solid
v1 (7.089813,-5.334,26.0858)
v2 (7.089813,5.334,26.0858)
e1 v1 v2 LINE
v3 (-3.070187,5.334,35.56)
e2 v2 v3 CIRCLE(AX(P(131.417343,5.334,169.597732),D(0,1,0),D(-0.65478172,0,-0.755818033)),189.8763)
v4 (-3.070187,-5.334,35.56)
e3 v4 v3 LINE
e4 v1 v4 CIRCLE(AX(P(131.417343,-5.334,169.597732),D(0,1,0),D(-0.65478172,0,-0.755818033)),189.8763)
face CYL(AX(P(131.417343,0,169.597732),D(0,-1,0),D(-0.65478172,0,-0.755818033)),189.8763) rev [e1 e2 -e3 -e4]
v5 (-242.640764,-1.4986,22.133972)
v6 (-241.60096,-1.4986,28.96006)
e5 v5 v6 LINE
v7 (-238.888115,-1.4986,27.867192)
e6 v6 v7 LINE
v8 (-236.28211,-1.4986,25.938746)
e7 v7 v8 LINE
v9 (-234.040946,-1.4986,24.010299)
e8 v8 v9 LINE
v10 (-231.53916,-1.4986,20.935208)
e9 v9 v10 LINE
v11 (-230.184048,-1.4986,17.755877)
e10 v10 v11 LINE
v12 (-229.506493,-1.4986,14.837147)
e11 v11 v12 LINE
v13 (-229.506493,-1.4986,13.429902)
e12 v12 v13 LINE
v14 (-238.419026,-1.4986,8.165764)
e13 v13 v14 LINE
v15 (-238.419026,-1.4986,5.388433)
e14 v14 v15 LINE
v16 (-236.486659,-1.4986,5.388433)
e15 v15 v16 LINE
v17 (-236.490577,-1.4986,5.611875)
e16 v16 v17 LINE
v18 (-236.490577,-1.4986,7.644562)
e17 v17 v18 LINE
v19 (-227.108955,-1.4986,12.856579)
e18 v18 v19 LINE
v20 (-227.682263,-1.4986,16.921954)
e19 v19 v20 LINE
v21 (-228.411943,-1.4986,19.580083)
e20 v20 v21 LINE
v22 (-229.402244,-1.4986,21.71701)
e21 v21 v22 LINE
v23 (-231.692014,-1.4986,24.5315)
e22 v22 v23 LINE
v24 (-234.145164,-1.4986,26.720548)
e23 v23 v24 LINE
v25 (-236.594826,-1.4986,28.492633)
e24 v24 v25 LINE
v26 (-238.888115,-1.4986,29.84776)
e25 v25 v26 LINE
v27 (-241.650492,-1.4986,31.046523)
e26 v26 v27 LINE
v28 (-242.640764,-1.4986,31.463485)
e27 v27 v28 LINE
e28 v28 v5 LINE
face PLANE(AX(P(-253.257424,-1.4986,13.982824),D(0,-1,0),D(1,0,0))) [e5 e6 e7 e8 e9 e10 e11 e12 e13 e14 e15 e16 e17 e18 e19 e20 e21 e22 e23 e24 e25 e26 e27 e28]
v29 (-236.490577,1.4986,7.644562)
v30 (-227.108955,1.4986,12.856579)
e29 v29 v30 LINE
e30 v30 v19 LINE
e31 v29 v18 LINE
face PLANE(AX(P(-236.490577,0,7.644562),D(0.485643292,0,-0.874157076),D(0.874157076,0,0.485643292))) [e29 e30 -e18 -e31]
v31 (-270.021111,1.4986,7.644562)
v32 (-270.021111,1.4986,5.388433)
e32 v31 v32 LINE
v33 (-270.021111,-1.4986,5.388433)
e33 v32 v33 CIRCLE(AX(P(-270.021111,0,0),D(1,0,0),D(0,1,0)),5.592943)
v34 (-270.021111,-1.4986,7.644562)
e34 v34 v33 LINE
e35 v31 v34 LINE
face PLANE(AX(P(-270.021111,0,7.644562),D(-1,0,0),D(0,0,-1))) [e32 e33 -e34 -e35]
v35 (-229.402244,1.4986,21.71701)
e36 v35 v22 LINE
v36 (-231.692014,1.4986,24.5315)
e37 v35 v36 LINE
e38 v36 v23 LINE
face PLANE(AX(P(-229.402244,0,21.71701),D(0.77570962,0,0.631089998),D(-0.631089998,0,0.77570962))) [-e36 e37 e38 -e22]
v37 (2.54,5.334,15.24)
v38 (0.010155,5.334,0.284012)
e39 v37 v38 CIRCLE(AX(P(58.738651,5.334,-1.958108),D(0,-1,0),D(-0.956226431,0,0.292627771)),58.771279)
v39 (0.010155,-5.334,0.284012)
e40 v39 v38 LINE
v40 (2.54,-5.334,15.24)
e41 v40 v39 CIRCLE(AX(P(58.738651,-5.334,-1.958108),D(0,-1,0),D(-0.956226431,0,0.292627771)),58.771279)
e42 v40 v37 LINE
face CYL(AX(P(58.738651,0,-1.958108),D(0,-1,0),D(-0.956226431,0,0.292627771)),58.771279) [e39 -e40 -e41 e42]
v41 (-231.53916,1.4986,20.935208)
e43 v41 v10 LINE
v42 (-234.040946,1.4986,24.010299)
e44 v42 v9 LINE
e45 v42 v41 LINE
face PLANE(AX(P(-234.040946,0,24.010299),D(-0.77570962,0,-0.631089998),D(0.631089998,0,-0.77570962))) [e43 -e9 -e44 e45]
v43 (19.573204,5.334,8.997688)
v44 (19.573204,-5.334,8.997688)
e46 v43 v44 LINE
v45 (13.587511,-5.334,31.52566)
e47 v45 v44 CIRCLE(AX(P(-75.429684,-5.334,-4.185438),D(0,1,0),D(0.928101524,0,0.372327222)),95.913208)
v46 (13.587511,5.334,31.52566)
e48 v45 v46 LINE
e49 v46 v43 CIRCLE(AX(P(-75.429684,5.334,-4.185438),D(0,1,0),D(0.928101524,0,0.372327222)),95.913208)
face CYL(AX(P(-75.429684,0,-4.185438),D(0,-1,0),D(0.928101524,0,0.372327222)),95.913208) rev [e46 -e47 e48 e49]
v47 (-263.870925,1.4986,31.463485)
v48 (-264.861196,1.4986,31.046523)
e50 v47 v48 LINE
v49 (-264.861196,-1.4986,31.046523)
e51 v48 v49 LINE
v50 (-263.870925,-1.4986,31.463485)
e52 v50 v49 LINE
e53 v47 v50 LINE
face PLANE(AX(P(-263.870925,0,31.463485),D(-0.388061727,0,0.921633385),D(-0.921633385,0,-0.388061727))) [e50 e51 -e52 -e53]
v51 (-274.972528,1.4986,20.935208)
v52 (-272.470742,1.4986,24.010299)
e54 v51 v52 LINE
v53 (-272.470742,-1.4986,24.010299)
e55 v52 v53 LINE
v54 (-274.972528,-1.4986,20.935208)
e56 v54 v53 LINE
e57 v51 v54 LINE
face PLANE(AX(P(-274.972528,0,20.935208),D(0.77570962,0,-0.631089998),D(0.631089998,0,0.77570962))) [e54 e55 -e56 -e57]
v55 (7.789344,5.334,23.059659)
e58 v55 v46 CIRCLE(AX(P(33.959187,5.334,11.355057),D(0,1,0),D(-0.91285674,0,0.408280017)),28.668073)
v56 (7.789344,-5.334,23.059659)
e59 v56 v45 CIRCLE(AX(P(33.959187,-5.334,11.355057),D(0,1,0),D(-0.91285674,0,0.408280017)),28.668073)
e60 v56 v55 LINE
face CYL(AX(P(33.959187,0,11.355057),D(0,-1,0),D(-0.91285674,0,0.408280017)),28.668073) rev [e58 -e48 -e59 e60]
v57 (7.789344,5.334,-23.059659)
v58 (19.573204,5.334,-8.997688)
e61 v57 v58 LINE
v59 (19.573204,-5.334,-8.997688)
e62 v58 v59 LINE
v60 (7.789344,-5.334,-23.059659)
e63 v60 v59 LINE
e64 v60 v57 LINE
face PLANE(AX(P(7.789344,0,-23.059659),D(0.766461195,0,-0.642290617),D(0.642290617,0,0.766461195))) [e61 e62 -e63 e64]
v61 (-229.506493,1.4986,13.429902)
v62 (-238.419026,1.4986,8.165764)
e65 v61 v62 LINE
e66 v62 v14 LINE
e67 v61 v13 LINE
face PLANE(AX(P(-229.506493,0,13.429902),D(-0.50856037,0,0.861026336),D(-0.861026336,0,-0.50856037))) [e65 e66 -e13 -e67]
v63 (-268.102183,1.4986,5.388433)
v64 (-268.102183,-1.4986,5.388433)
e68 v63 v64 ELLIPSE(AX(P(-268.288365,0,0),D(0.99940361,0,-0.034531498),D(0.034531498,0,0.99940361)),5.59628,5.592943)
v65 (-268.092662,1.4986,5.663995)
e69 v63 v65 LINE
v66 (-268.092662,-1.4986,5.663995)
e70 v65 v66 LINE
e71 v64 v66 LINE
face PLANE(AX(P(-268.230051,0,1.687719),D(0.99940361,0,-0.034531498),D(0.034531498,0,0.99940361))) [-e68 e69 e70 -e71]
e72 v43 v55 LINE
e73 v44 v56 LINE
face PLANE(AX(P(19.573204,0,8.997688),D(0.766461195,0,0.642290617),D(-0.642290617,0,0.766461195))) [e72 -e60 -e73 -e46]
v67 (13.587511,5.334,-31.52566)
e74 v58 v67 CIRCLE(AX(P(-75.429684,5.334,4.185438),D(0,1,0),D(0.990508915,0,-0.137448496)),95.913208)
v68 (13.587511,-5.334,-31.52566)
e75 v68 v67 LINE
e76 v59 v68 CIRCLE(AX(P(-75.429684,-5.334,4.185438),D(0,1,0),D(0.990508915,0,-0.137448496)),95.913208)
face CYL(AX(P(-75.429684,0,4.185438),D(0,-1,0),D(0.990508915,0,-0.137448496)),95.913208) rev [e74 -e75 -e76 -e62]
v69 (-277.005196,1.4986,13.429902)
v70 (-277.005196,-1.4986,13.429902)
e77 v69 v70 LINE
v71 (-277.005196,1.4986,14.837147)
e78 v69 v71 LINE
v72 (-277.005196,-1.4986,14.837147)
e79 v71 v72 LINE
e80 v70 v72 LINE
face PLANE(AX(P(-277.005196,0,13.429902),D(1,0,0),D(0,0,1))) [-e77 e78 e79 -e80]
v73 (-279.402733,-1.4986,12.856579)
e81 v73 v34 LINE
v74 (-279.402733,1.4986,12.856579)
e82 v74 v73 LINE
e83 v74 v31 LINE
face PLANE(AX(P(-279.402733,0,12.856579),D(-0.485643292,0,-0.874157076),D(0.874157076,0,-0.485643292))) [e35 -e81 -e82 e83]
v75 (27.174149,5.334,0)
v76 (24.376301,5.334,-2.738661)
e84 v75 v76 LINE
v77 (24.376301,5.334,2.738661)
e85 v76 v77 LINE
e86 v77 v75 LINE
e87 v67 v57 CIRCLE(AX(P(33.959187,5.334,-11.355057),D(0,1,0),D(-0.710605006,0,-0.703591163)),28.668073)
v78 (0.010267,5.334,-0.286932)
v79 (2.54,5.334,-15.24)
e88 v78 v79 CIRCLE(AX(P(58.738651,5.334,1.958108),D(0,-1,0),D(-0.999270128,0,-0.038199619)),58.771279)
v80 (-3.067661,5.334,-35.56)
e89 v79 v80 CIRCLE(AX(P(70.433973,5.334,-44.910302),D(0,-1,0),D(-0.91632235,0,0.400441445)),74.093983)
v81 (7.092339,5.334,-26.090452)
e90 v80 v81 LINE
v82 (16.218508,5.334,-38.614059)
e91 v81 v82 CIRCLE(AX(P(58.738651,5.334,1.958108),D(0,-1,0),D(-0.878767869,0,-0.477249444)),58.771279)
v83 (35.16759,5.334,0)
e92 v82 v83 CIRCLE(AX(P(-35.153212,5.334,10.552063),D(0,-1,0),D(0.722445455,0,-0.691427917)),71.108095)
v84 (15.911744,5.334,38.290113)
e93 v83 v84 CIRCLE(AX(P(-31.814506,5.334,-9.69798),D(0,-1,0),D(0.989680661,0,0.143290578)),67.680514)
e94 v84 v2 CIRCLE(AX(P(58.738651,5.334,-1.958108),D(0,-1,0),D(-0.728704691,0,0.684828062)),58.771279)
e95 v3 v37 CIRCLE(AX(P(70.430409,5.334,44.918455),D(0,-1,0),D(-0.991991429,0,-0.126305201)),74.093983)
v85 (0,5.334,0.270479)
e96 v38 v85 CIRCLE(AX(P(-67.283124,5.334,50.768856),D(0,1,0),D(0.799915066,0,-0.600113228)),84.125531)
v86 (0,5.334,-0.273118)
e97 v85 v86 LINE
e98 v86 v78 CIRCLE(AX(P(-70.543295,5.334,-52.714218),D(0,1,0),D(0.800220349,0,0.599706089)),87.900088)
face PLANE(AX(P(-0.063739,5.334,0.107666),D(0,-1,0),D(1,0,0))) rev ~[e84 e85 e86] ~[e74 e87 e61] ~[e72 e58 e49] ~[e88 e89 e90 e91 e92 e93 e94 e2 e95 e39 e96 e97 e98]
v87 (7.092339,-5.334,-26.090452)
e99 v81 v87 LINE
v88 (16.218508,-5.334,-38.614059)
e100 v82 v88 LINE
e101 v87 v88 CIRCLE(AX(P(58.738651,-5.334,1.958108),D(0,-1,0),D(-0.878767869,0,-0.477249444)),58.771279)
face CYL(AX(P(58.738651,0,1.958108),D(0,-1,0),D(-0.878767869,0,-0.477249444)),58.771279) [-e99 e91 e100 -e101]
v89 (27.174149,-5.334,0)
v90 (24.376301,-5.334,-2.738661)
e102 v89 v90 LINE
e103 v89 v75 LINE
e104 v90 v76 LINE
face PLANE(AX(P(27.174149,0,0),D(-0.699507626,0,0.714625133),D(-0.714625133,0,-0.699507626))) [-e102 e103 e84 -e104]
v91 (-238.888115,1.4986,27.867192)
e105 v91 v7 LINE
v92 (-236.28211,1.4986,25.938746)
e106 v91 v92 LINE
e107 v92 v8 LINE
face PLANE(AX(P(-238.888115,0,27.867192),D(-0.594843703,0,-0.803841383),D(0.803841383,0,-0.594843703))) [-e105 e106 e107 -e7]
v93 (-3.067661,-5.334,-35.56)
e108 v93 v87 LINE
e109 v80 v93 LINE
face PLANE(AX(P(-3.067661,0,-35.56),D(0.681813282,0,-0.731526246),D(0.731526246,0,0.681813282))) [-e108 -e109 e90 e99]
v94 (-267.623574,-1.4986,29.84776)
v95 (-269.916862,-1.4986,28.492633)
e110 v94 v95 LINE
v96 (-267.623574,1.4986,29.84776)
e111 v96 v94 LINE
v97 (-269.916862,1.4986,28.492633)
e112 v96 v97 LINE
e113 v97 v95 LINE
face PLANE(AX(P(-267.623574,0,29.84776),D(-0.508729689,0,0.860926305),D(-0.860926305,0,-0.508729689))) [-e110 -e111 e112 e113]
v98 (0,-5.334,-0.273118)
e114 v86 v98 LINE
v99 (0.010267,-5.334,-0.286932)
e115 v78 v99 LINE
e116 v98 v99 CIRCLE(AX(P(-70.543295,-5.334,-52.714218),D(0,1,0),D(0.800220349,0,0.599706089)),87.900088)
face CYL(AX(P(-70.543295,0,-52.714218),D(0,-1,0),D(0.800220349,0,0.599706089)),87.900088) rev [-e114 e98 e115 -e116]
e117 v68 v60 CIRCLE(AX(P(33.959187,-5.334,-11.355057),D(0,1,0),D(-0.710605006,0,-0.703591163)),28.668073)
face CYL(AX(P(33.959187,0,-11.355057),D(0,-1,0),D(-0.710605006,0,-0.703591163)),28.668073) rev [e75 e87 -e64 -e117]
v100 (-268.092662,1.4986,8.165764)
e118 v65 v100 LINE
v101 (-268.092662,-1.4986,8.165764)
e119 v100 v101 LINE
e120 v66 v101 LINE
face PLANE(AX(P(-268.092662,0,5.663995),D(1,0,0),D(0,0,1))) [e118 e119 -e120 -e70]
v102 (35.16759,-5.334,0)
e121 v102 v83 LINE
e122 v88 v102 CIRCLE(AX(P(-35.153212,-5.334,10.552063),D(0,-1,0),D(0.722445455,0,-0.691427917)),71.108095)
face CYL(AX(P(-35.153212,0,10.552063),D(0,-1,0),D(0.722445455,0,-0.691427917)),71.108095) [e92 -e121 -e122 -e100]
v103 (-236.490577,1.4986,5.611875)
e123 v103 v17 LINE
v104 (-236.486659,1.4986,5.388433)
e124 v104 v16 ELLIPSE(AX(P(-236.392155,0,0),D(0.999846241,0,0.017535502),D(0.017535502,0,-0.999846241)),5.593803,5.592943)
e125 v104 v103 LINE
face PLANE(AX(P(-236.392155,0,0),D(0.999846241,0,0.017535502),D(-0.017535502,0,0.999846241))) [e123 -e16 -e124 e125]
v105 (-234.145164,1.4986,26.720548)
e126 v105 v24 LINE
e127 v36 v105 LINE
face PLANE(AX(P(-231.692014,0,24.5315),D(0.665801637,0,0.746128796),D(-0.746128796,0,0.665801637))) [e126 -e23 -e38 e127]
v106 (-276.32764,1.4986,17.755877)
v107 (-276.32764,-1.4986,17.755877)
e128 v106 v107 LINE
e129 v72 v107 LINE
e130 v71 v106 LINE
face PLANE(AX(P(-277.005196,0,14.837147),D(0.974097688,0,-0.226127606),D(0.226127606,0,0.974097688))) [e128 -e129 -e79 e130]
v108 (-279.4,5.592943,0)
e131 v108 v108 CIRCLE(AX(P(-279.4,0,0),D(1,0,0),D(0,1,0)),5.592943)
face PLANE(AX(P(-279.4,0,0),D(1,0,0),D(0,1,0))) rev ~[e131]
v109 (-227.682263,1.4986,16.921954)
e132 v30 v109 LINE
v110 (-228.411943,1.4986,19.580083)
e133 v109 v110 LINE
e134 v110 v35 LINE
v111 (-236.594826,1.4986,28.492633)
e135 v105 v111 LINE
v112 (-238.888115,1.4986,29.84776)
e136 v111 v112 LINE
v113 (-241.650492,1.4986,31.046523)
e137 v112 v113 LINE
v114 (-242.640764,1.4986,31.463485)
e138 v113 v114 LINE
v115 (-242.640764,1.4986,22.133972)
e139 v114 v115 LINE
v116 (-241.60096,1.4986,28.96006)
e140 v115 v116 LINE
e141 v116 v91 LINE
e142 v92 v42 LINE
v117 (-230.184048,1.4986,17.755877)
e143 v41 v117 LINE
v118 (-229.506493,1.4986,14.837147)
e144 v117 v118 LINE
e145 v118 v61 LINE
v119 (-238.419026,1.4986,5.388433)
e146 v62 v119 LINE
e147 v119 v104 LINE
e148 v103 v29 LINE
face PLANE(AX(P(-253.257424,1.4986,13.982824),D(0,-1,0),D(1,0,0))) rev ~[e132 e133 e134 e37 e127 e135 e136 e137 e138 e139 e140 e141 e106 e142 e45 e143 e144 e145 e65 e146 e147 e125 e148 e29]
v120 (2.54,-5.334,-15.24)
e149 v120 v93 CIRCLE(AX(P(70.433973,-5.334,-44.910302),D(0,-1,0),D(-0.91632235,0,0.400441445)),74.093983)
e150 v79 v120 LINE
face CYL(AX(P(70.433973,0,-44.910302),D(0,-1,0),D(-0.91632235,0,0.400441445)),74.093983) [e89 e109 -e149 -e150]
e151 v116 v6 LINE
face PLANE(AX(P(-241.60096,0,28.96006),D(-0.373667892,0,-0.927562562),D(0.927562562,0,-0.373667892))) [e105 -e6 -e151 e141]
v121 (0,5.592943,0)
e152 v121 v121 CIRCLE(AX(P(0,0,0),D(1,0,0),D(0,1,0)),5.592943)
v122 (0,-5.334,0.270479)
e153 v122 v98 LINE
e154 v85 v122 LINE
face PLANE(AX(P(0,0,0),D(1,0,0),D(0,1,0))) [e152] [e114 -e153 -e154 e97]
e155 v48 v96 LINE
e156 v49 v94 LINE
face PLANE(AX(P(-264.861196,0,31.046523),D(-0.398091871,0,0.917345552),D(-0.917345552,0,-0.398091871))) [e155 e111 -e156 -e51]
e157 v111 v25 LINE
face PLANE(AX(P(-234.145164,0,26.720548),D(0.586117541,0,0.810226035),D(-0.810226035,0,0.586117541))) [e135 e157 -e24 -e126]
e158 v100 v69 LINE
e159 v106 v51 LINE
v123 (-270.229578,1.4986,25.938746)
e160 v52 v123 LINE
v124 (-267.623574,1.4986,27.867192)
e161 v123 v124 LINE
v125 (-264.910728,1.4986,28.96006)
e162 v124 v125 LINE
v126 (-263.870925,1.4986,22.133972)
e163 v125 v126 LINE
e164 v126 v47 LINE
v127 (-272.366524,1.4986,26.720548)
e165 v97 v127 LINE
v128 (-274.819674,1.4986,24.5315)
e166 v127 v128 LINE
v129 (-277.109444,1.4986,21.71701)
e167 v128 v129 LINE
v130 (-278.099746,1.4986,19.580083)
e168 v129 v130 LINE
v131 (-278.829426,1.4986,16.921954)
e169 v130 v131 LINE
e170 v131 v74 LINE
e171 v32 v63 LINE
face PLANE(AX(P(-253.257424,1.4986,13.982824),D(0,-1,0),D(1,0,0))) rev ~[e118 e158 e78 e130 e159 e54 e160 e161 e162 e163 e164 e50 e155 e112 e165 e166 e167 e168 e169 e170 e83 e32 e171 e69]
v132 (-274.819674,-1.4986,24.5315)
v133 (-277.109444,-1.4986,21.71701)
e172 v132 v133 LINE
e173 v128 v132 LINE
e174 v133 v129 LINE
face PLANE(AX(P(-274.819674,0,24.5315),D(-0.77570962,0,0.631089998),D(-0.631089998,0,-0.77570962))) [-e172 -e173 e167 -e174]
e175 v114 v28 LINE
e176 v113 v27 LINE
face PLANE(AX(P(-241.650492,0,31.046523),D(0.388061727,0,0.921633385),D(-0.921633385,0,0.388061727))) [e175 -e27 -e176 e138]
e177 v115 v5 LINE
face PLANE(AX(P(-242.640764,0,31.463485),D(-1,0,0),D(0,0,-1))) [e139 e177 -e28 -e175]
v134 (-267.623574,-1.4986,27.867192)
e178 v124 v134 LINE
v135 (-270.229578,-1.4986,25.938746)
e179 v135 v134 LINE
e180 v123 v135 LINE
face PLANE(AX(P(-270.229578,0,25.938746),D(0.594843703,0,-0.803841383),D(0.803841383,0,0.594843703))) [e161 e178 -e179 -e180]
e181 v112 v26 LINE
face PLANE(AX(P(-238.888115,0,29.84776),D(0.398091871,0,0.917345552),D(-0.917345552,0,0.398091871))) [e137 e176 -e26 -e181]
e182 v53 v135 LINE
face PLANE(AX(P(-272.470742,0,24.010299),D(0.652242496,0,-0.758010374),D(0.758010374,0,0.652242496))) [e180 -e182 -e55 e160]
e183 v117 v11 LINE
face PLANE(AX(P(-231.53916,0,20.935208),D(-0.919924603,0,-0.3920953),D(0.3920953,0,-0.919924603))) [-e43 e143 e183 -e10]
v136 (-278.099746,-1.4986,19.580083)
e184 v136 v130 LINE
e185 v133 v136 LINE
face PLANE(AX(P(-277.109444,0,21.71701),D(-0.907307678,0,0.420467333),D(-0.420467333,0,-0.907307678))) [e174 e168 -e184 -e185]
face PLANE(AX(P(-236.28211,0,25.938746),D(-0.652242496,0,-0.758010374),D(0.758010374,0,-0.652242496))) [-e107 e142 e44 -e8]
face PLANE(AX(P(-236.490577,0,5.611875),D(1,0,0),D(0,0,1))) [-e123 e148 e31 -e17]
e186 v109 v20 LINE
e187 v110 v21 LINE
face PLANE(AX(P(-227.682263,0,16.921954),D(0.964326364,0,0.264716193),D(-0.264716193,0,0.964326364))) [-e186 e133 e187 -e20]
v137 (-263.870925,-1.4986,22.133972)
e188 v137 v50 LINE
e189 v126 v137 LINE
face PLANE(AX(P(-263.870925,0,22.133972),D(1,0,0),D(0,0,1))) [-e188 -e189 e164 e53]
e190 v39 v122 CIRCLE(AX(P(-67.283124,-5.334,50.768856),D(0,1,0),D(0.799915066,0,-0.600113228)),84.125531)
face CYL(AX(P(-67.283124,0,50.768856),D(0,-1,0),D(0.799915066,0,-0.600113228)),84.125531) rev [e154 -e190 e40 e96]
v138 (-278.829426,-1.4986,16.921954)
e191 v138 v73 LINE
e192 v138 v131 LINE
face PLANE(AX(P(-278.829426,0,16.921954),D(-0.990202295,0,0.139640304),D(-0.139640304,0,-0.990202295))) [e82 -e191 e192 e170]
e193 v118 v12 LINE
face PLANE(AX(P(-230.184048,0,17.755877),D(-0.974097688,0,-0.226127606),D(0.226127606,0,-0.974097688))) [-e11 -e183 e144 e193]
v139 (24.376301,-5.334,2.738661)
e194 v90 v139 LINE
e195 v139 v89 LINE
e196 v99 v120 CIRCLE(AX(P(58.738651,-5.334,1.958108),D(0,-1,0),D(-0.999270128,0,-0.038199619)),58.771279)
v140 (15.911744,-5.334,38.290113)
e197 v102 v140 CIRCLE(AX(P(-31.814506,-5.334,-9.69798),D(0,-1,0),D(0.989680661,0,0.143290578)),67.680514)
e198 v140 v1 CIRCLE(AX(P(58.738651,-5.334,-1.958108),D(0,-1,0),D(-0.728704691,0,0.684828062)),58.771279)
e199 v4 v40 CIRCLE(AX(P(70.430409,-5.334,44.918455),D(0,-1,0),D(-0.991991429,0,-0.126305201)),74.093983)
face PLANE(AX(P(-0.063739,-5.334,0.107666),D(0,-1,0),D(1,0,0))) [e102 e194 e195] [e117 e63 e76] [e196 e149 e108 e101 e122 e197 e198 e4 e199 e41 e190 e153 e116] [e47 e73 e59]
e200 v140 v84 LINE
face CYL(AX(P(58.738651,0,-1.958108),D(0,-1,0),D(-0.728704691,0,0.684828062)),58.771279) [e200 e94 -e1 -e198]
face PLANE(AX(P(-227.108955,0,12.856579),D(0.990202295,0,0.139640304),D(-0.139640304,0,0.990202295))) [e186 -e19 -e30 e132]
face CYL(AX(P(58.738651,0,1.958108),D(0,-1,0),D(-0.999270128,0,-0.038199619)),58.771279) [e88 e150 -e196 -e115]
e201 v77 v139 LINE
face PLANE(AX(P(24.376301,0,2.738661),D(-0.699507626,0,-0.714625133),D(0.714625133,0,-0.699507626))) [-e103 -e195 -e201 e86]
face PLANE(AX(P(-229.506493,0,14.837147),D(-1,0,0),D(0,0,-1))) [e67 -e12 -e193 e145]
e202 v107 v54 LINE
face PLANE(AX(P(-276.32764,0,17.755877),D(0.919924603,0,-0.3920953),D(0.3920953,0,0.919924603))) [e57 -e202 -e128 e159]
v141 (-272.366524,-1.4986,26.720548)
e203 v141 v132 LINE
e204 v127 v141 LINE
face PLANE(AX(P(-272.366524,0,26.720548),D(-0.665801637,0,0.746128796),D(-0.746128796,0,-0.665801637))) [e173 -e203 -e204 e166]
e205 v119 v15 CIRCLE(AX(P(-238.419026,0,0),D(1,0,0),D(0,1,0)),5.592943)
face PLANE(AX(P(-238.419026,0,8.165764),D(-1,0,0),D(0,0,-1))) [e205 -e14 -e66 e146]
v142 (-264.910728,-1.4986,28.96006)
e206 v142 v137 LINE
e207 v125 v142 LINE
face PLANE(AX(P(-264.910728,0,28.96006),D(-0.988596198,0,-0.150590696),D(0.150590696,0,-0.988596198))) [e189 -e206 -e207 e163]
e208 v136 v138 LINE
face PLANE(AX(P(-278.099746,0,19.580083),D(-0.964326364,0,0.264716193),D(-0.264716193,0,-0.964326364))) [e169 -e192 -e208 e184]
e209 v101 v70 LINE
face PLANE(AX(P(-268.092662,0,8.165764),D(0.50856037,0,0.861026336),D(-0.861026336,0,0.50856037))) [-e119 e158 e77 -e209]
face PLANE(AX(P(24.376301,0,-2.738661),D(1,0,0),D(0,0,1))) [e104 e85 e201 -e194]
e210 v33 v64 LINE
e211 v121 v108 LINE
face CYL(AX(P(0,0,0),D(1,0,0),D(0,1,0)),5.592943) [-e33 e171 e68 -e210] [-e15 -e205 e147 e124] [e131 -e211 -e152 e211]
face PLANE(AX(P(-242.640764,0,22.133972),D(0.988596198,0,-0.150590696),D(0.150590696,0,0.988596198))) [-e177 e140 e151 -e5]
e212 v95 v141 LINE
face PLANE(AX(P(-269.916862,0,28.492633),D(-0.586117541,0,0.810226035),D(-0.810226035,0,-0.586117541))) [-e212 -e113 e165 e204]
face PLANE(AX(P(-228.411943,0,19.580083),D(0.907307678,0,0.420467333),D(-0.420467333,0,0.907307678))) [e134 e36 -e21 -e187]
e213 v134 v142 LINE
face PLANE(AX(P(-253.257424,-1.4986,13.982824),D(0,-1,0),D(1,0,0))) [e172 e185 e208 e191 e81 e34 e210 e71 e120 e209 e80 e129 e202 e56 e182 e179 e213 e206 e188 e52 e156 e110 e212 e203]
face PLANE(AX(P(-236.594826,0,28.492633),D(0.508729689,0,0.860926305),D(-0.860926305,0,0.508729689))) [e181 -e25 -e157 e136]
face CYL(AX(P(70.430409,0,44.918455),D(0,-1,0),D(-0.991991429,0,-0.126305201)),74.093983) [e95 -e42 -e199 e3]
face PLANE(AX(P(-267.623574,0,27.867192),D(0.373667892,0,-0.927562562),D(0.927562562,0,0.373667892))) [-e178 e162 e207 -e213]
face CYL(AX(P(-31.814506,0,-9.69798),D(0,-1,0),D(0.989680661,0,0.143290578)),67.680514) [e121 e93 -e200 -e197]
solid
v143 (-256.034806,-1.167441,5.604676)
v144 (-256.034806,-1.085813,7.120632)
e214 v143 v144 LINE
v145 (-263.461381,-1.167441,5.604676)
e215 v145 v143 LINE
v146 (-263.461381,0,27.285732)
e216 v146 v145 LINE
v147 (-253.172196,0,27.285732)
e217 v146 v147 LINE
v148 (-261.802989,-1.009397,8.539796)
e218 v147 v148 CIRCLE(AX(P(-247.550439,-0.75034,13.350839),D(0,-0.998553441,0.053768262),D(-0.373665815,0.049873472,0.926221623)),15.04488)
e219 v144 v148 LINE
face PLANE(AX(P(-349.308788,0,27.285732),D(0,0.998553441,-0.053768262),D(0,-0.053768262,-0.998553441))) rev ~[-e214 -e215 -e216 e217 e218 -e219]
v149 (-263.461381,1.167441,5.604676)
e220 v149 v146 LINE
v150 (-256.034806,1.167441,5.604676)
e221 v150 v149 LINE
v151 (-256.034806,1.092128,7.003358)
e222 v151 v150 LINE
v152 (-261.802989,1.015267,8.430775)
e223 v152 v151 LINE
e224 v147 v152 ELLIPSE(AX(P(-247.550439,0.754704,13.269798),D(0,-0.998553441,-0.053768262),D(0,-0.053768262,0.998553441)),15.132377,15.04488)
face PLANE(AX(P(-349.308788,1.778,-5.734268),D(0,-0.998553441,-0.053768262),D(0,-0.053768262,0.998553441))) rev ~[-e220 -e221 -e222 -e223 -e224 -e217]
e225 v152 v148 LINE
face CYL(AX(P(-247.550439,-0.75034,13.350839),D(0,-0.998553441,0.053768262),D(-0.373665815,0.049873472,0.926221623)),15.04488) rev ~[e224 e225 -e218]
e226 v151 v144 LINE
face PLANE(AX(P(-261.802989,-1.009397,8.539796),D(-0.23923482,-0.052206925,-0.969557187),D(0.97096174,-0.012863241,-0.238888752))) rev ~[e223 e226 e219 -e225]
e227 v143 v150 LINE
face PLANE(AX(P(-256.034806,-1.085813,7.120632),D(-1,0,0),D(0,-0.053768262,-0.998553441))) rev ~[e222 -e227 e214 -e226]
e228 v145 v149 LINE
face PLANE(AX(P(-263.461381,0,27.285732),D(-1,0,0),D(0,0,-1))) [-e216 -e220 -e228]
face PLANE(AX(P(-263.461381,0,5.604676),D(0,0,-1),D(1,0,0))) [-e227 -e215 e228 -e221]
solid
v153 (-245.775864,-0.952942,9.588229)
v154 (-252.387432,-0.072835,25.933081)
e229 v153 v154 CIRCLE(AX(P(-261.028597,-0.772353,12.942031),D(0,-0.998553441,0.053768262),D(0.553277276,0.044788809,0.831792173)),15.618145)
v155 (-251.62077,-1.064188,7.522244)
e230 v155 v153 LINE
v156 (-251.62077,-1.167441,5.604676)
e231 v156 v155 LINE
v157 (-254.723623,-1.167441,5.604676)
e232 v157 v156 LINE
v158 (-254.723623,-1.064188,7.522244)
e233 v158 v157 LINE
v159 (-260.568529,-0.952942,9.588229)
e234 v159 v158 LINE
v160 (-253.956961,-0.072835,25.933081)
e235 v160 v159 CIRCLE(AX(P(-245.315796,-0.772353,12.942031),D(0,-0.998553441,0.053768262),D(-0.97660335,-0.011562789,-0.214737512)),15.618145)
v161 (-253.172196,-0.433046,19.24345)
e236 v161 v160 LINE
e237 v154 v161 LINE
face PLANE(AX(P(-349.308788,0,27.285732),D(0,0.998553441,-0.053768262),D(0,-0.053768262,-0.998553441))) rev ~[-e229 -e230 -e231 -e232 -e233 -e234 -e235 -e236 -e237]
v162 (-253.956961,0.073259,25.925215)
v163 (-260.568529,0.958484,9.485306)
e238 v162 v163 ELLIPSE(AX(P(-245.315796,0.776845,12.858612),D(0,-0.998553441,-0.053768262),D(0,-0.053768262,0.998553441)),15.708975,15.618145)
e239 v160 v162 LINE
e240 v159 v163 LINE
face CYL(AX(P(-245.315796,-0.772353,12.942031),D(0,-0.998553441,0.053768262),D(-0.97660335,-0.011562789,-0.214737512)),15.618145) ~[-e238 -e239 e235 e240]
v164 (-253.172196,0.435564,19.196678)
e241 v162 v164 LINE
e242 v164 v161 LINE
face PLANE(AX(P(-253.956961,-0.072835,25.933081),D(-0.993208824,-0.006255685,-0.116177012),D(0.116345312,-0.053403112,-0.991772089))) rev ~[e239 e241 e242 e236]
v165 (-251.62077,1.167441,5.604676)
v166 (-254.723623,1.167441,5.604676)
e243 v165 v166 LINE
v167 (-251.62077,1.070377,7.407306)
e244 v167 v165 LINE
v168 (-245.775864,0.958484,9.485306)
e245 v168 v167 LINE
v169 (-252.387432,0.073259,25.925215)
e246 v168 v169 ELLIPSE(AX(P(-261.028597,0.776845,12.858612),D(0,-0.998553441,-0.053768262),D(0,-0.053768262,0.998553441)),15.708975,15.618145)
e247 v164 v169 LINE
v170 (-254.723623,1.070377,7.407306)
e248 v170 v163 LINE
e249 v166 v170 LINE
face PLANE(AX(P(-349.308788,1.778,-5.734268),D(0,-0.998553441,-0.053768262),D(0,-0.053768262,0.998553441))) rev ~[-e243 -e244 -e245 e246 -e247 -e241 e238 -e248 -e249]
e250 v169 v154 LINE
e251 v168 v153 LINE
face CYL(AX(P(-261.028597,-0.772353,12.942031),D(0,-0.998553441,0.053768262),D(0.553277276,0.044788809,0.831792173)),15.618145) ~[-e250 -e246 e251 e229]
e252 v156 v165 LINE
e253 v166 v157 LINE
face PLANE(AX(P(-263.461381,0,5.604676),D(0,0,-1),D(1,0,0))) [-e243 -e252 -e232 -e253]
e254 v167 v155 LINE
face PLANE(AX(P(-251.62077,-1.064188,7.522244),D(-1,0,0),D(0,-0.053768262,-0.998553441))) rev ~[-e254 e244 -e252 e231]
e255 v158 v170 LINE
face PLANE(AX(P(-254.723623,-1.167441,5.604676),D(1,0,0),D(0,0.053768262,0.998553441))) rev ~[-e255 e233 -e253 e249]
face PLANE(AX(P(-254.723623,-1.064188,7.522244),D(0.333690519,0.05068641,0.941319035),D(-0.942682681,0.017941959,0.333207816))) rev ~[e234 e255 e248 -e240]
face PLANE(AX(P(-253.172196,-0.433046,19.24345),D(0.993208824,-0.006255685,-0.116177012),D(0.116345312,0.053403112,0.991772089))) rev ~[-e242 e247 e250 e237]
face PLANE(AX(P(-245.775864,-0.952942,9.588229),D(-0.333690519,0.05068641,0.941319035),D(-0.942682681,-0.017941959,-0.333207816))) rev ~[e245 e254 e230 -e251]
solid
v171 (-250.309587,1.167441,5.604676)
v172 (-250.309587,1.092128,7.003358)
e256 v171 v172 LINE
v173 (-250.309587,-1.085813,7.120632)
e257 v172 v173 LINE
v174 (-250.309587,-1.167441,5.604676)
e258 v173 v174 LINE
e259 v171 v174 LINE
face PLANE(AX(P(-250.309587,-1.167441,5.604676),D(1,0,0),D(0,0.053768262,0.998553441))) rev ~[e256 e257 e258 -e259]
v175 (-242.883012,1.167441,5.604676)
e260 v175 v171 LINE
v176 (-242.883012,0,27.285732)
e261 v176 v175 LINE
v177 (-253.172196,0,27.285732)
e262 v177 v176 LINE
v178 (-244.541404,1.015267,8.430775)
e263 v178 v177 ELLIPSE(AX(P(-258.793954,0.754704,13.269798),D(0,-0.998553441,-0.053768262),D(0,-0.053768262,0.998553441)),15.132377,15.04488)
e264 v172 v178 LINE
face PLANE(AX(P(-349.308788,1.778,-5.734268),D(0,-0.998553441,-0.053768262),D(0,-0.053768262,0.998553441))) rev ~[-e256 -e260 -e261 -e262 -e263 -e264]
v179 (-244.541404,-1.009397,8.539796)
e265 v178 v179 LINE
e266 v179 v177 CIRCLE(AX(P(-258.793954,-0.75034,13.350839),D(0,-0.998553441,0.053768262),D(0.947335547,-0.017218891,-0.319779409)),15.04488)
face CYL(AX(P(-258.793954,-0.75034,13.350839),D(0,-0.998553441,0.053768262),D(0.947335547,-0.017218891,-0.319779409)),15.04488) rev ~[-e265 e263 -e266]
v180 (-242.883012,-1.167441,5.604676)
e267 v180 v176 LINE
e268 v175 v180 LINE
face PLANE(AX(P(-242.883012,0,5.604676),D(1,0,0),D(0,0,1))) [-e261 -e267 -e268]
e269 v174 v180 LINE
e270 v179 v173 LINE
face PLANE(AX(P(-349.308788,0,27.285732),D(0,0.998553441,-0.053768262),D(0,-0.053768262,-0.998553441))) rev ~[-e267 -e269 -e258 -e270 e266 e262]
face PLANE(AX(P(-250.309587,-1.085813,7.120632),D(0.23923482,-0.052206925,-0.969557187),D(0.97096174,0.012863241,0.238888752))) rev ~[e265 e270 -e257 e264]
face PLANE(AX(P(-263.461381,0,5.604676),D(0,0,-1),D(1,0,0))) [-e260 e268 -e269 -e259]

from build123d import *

# Parameters (mm, degrees)
F0_R        = 5.5929426232
F1_DEPTH    = 279.4
F5_DEPTH    = 1.4986
F6_DEPTH    = 5.334
F7_DEPTH    = 1.778
F8_T1_DEPTH = 192.2731836011
F10_DEPTH   = 12.7


# Not quite as in the source:
# - a fillet or chamfer that OpenCascade refuses, or shapes differently, is made with other operations: its cross-section is extruded or revolved along the edge and cut away or added


with BuildPart() as f1:
    # F0 (on Right) → F1 (new body)
    with BuildSketch(Plane.YZ):
        Circle(F0_R)
    extrude(amount=-F1_DEPTH)

    # F2 (on Front) → F5 (join, symmetric)
    with BuildSketch(Plane.XZ):
        Polygon((-278.8294255733, 16.9219542295), (-279.4027328491, 12.8565793857), (-270.0211107731, 7.6445620507), (-270.0211107731, 5.6118746288), (-270.0211107731, 0), (-236.3921552896, 0), (-236.4905774593, 5.6118746288), (-236.4905774593, 7.6445620507), (-227.1089553833, 12.8565793857), (-227.6822626591, 16.9219542295), (-228.4119427204, 19.5800829679), (-229.402244091, 21.7170100659), (-231.692014207, 24.531500414), (-234.1451644897, 26.7205480486), (-236.594825983, 28.4926332533), (-238.8881146908, 29.8477597535), (-241.6504919529, 31.0465227813), (-242.6407635212, 31.4634852111), (-242.6407635212, 22.1339724958), (-241.6009604931, 28.9600603282), (-238.8881146908, 27.8671924025), (-236.2821102142, 25.9387455881), (-234.0409457684, 24.0102987736), (-231.5391600132, 20.9352076054), (-230.1840484142, 17.7558772266), (-229.5064926147, 14.8371467367), (-229.5064926147, 13.4299015626), (-238.4190261364, 8.1657636911), (-238.4190261364, 5.6639946997), (-238.4190261364, 1.6877186717), (-268.2300508022, 1.6877186717), (-268.092662096, 5.6639946997), (-268.092662096, 8.1657636911), (-277.0051956177, 13.4299015626), (-277.0051956177, 14.8371467367), (-276.3276398182, 17.7558772266), (-274.9725282192, 20.9352076054), (-272.4707424641, 24.0102987736), (-270.2295780182, 25.9387455881), (-267.6235735416, 27.8671924025), (-264.9107277393, 28.9600603282), (-263.8709247112, 22.1339724958), (-263.8709247112, 31.4634852111), (-264.8611962795, 31.0465227813), (-267.6235735416, 29.8477597535), (-269.9168622494, 28.4926332533), (-272.3665237427, 26.7205480486), (-274.8196740255, 24.531500414), (-277.1094441414, 21.7170100659), (-278.099745512, 19.5800829679), align=None)
    extrude(amount=F5_DEPTH, both=True)

    # F3 (on Front) → F6 (join, symmetric)
    with BuildSketch(Plane.XZ):
        with BuildLine():
            ThreePointArc((0.0101553228, 0.2840123077), (-0.0967004528, 0.1418930692), (-0.2038563749, 0))
            Line((-0.2038563749, 0), (0, 0))
            ThreePointArc((0, 0), (0.0049059903, 0.1420122922), (0.0101553228, 0.2840123077))
        make_face()
        with BuildLine():
            Line((0, 0), (-0.2038563749, 0))
            ThreePointArc((-0.2038563749, 0), (-0.0966486695, -0.1433570013), (0.0102668641, -0.2869320359))
            ThreePointArc((0.0102668641, -0.2869320359), (0.004958213, -0.1434722876), (0, 0))
        make_face()
        with BuildLine():
            ThreePointArc((0.0101553228, 0.2840123077), (0.0049059903, 0.1420122922), (0, 0))
            ThreePointArc((0, 0), (0.004958213, -0.1434722876), (0.0102668641, -0.2869320359))
            ThreePointArc((0.0102668641, -0.2869320359), (0.7907915752, -7.8454061019), (2.54, -15.24))
            Line((2.54, -15.24), (2.54, 15.24))
            ThreePointArc((2.54, 15.24), (0.7905478985, 7.8439656383), (0.0101553228, 0.2840123077))
        make_face()
        with BuildLine():
            Line((2.54, 15.24), (2.54, -15.24))
            ThreePointArc((2.54, -15.24), (4.5439363149, -20.7794421559), (7.0923387837, -26.0904519478))
            ThreePointArc((7.0923387837, -26.0904519478), (11.2408564011, -32.6543576843), (16.2185082823, -38.6140589091))
            Line((16.2185082823, -38.6140589091), (23.6472193128, -6.1149669525))
            Line((23.6472193128, -6.1149669525), (19.8538427248, 0))
            Line((19.8538427248, 0), (23.928701104, 5.9311091676))
            Line((23.928701104, 5.9311091676), (15.9117437896, 38.290112876))
            ThreePointArc((15.9117437896, 38.290112876), (11.1082726784, 32.4716804641), (7.0898126318, 26.0858))
            ThreePointArc((7.0898126318, 26.0858), (4.5429123731, 20.7770014472), (2.54, 15.24))
        make_face()
        with BuildLine():
            ThreePointArc((19.5732042193, -8.9976880699), (17.2672693148, -20.4441869398), (13.5875111446, -31.5256603062))
            ThreePointArc((13.5875111446, -31.5256603062), (10.3065645811, -27.5541885084), (7.7893436652, -23.0596587829))
            Line((7.7893436652, -23.0596587829), (19.5732042193, -8.9976880699))
        make_face(mode=Mode.SUBTRACT)
        with BuildLine():
            Line((19.5732042193, 8.9976880699), (7.7893436652, 23.0596587829))
            ThreePointArc((7.7893436652, 23.0596587829), (10.3065645811, 27.5541885084), (13.5875111446, 31.5256603062))
            ThreePointArc((13.5875111446, 31.5256603062), (17.2672693148, 20.4441869398), (19.5732042193, 8.9976880699))
        make_face(mode=Mode.SUBTRACT)
        with BuildLine():
            ThreePointArc((7.0923387837, -26.0904519478), (4.5439363149, -20.7794421559), (2.54, -15.24))
            ThreePointArc((2.54, -15.24), (-0.9901478251, -25.1995599957), (-3.0676612163, -35.56))
            Line((-3.0676612163, -35.56), (7.0923387837, -26.0904519478))
        make_face()
        with BuildLine():
            ThreePointArc((-3.0701873682, 35.56), (-0.9914342988, 25.1994632411), (2.54, 15.24))
            ThreePointArc((2.54, 15.24), (4.5429123731, 20.7770014472), (7.0898126318, 26.0858))
            ThreePointArc((7.0898126318, 26.0858), (1.9231383714, 30.7299517315), (-3.0701873682, 35.56))
        make_face()
        with BuildLine():
            Line((23.6472193128, -6.1149669525), (16.2185082823, -38.6140589091))
            ThreePointArc((16.2185082823, -38.6140589091), (28.6827408005, -20.7741612342), (35.1675897837, 0))
            ThreePointArc((35.1675897837, 0), (28.6506436465, 20.709546245), (15.9117437896, 38.290112876))
            Line((15.9117437896, 38.290112876), (23.928701104, 5.9311091676))
            Line((23.928701104, 5.9311091676), (19.8538427248, 0))
            Line((19.8538427248, 0), (23.6472193128, -6.1149669525))
        make_face()
        Polygon((24.3763010949, 2.7386606671), (27.1741487086, 0), (24.3763010949, -2.7386606671), align=None, mode=Mode.SUBTRACT)
    extrude(amount=F6_DEPTH, both=True)


with BuildPart() as f7:
    # F4 (on Front) → F7 (new body, symmetric)
    with BuildSketch(Plane.XZ):
        Polygon((-263.461381197, 22.2413148731), (-263.461381197, 5.6046764366), (-243.5538172722, 5.6046764366), (-242.8830116987, 5.6046764366), (-242.8830116987, 27.2857323289), (-263.461381197, 27.2857323289), align=None)
    extrude(amount=F7_DEPTH, both=True)

    # F8: chamfer of 1.778 x 33.02 on 2 edges, made by hand

    # F8_s2 → F8_t1 (cut)
    with BuildSketch(Plane.YZ.offset(-349.3087882484)):
        Polygon((0, 27.2857323289), (-1.778, -5.7342676711), (-1.778, 27.2857323289), align=None)
        Polygon((1.778, -5.7342676711), (0, 27.2857323289), (1.778, 27.2857323289), align=None)
    extrude(amount=F8_T1_DEPTH, mode=Mode.SUBTRACT)

    # F9 (on face) → F10 (cut, symmetric)
    with BuildSketch(Plane(origin=(0, -1.4649841536, 0.0788837621), x_dir=(1, 0, 0), z_dir=(0, -0.9985534407, 0.0537682622))):
        with BuildLine():
            Line((-253.9569606738, 25.8916511639), (-253.1721964478, 19.1923287956))
            Line((-253.1721964478, 19.1923287956), (-253.1721964478, 27.2462618997))
            ThreePointArc((-253.1721964478, 27.2462618997), (-261.2199041562, 19.5756184054), (-261.8029889563, 8.4731689868))
            Line((-261.8029889563, 8.4731689868), (-256.0348063707, 7.0519491145))
            Line((-256.0348063707, 7.0519491145), (-256.0348063707, 5.5337976408))
            Line((-256.0348063707, 5.5337976408), (-254.723623395, 5.5337976408))
            Line((-254.723623395, 5.5337976408), (-254.723623395, 7.4541432704))
            Line((-254.723623395, 7.4541432704), (-260.5685285915, 9.5231209762))
            ThreePointArc((-260.5685285915, 9.5231209762), (-259.7972246978, 18.731111896), (-253.9569606738, 25.8916511639))
        make_face()
        with BuildLine():
            Line((-251.6207695007, 7.4541432704), (-251.6207695007, 5.5337976408))
            Line((-251.6207695007, 5.5337976408), (-250.309586525, 5.5337976408))
            Line((-250.309586525, 5.5337976408), (-250.309586525, 7.0519491145))
            Line((-250.309586525, 7.0519491145), (-244.5414039394, 8.4731689868))
            ThreePointArc((-244.5414039394, 8.4731689868), (-245.1244887395, 19.5756184054), (-253.1721964478, 27.2462618997))
            Line((-253.1721964478, 27.2462618997), (-253.1721964478, 19.1923287956))
            Line((-253.1721964478, 19.1923287956), (-252.3874322219, 25.8916511639))
            ThreePointArc((-252.3874322219, 25.8916511639), (-246.5471681979, 18.731111896), (-245.7758643042, 9.5231209762))
            Line((-245.7758643042, 9.5231209762), (-251.6207695007, 7.4541432704))
        make_face()
    extrude(amount=F10_DEPTH, both=True, mode=Mode.SUBTRACT)


solid = Compound([f1.part, f7.part])
